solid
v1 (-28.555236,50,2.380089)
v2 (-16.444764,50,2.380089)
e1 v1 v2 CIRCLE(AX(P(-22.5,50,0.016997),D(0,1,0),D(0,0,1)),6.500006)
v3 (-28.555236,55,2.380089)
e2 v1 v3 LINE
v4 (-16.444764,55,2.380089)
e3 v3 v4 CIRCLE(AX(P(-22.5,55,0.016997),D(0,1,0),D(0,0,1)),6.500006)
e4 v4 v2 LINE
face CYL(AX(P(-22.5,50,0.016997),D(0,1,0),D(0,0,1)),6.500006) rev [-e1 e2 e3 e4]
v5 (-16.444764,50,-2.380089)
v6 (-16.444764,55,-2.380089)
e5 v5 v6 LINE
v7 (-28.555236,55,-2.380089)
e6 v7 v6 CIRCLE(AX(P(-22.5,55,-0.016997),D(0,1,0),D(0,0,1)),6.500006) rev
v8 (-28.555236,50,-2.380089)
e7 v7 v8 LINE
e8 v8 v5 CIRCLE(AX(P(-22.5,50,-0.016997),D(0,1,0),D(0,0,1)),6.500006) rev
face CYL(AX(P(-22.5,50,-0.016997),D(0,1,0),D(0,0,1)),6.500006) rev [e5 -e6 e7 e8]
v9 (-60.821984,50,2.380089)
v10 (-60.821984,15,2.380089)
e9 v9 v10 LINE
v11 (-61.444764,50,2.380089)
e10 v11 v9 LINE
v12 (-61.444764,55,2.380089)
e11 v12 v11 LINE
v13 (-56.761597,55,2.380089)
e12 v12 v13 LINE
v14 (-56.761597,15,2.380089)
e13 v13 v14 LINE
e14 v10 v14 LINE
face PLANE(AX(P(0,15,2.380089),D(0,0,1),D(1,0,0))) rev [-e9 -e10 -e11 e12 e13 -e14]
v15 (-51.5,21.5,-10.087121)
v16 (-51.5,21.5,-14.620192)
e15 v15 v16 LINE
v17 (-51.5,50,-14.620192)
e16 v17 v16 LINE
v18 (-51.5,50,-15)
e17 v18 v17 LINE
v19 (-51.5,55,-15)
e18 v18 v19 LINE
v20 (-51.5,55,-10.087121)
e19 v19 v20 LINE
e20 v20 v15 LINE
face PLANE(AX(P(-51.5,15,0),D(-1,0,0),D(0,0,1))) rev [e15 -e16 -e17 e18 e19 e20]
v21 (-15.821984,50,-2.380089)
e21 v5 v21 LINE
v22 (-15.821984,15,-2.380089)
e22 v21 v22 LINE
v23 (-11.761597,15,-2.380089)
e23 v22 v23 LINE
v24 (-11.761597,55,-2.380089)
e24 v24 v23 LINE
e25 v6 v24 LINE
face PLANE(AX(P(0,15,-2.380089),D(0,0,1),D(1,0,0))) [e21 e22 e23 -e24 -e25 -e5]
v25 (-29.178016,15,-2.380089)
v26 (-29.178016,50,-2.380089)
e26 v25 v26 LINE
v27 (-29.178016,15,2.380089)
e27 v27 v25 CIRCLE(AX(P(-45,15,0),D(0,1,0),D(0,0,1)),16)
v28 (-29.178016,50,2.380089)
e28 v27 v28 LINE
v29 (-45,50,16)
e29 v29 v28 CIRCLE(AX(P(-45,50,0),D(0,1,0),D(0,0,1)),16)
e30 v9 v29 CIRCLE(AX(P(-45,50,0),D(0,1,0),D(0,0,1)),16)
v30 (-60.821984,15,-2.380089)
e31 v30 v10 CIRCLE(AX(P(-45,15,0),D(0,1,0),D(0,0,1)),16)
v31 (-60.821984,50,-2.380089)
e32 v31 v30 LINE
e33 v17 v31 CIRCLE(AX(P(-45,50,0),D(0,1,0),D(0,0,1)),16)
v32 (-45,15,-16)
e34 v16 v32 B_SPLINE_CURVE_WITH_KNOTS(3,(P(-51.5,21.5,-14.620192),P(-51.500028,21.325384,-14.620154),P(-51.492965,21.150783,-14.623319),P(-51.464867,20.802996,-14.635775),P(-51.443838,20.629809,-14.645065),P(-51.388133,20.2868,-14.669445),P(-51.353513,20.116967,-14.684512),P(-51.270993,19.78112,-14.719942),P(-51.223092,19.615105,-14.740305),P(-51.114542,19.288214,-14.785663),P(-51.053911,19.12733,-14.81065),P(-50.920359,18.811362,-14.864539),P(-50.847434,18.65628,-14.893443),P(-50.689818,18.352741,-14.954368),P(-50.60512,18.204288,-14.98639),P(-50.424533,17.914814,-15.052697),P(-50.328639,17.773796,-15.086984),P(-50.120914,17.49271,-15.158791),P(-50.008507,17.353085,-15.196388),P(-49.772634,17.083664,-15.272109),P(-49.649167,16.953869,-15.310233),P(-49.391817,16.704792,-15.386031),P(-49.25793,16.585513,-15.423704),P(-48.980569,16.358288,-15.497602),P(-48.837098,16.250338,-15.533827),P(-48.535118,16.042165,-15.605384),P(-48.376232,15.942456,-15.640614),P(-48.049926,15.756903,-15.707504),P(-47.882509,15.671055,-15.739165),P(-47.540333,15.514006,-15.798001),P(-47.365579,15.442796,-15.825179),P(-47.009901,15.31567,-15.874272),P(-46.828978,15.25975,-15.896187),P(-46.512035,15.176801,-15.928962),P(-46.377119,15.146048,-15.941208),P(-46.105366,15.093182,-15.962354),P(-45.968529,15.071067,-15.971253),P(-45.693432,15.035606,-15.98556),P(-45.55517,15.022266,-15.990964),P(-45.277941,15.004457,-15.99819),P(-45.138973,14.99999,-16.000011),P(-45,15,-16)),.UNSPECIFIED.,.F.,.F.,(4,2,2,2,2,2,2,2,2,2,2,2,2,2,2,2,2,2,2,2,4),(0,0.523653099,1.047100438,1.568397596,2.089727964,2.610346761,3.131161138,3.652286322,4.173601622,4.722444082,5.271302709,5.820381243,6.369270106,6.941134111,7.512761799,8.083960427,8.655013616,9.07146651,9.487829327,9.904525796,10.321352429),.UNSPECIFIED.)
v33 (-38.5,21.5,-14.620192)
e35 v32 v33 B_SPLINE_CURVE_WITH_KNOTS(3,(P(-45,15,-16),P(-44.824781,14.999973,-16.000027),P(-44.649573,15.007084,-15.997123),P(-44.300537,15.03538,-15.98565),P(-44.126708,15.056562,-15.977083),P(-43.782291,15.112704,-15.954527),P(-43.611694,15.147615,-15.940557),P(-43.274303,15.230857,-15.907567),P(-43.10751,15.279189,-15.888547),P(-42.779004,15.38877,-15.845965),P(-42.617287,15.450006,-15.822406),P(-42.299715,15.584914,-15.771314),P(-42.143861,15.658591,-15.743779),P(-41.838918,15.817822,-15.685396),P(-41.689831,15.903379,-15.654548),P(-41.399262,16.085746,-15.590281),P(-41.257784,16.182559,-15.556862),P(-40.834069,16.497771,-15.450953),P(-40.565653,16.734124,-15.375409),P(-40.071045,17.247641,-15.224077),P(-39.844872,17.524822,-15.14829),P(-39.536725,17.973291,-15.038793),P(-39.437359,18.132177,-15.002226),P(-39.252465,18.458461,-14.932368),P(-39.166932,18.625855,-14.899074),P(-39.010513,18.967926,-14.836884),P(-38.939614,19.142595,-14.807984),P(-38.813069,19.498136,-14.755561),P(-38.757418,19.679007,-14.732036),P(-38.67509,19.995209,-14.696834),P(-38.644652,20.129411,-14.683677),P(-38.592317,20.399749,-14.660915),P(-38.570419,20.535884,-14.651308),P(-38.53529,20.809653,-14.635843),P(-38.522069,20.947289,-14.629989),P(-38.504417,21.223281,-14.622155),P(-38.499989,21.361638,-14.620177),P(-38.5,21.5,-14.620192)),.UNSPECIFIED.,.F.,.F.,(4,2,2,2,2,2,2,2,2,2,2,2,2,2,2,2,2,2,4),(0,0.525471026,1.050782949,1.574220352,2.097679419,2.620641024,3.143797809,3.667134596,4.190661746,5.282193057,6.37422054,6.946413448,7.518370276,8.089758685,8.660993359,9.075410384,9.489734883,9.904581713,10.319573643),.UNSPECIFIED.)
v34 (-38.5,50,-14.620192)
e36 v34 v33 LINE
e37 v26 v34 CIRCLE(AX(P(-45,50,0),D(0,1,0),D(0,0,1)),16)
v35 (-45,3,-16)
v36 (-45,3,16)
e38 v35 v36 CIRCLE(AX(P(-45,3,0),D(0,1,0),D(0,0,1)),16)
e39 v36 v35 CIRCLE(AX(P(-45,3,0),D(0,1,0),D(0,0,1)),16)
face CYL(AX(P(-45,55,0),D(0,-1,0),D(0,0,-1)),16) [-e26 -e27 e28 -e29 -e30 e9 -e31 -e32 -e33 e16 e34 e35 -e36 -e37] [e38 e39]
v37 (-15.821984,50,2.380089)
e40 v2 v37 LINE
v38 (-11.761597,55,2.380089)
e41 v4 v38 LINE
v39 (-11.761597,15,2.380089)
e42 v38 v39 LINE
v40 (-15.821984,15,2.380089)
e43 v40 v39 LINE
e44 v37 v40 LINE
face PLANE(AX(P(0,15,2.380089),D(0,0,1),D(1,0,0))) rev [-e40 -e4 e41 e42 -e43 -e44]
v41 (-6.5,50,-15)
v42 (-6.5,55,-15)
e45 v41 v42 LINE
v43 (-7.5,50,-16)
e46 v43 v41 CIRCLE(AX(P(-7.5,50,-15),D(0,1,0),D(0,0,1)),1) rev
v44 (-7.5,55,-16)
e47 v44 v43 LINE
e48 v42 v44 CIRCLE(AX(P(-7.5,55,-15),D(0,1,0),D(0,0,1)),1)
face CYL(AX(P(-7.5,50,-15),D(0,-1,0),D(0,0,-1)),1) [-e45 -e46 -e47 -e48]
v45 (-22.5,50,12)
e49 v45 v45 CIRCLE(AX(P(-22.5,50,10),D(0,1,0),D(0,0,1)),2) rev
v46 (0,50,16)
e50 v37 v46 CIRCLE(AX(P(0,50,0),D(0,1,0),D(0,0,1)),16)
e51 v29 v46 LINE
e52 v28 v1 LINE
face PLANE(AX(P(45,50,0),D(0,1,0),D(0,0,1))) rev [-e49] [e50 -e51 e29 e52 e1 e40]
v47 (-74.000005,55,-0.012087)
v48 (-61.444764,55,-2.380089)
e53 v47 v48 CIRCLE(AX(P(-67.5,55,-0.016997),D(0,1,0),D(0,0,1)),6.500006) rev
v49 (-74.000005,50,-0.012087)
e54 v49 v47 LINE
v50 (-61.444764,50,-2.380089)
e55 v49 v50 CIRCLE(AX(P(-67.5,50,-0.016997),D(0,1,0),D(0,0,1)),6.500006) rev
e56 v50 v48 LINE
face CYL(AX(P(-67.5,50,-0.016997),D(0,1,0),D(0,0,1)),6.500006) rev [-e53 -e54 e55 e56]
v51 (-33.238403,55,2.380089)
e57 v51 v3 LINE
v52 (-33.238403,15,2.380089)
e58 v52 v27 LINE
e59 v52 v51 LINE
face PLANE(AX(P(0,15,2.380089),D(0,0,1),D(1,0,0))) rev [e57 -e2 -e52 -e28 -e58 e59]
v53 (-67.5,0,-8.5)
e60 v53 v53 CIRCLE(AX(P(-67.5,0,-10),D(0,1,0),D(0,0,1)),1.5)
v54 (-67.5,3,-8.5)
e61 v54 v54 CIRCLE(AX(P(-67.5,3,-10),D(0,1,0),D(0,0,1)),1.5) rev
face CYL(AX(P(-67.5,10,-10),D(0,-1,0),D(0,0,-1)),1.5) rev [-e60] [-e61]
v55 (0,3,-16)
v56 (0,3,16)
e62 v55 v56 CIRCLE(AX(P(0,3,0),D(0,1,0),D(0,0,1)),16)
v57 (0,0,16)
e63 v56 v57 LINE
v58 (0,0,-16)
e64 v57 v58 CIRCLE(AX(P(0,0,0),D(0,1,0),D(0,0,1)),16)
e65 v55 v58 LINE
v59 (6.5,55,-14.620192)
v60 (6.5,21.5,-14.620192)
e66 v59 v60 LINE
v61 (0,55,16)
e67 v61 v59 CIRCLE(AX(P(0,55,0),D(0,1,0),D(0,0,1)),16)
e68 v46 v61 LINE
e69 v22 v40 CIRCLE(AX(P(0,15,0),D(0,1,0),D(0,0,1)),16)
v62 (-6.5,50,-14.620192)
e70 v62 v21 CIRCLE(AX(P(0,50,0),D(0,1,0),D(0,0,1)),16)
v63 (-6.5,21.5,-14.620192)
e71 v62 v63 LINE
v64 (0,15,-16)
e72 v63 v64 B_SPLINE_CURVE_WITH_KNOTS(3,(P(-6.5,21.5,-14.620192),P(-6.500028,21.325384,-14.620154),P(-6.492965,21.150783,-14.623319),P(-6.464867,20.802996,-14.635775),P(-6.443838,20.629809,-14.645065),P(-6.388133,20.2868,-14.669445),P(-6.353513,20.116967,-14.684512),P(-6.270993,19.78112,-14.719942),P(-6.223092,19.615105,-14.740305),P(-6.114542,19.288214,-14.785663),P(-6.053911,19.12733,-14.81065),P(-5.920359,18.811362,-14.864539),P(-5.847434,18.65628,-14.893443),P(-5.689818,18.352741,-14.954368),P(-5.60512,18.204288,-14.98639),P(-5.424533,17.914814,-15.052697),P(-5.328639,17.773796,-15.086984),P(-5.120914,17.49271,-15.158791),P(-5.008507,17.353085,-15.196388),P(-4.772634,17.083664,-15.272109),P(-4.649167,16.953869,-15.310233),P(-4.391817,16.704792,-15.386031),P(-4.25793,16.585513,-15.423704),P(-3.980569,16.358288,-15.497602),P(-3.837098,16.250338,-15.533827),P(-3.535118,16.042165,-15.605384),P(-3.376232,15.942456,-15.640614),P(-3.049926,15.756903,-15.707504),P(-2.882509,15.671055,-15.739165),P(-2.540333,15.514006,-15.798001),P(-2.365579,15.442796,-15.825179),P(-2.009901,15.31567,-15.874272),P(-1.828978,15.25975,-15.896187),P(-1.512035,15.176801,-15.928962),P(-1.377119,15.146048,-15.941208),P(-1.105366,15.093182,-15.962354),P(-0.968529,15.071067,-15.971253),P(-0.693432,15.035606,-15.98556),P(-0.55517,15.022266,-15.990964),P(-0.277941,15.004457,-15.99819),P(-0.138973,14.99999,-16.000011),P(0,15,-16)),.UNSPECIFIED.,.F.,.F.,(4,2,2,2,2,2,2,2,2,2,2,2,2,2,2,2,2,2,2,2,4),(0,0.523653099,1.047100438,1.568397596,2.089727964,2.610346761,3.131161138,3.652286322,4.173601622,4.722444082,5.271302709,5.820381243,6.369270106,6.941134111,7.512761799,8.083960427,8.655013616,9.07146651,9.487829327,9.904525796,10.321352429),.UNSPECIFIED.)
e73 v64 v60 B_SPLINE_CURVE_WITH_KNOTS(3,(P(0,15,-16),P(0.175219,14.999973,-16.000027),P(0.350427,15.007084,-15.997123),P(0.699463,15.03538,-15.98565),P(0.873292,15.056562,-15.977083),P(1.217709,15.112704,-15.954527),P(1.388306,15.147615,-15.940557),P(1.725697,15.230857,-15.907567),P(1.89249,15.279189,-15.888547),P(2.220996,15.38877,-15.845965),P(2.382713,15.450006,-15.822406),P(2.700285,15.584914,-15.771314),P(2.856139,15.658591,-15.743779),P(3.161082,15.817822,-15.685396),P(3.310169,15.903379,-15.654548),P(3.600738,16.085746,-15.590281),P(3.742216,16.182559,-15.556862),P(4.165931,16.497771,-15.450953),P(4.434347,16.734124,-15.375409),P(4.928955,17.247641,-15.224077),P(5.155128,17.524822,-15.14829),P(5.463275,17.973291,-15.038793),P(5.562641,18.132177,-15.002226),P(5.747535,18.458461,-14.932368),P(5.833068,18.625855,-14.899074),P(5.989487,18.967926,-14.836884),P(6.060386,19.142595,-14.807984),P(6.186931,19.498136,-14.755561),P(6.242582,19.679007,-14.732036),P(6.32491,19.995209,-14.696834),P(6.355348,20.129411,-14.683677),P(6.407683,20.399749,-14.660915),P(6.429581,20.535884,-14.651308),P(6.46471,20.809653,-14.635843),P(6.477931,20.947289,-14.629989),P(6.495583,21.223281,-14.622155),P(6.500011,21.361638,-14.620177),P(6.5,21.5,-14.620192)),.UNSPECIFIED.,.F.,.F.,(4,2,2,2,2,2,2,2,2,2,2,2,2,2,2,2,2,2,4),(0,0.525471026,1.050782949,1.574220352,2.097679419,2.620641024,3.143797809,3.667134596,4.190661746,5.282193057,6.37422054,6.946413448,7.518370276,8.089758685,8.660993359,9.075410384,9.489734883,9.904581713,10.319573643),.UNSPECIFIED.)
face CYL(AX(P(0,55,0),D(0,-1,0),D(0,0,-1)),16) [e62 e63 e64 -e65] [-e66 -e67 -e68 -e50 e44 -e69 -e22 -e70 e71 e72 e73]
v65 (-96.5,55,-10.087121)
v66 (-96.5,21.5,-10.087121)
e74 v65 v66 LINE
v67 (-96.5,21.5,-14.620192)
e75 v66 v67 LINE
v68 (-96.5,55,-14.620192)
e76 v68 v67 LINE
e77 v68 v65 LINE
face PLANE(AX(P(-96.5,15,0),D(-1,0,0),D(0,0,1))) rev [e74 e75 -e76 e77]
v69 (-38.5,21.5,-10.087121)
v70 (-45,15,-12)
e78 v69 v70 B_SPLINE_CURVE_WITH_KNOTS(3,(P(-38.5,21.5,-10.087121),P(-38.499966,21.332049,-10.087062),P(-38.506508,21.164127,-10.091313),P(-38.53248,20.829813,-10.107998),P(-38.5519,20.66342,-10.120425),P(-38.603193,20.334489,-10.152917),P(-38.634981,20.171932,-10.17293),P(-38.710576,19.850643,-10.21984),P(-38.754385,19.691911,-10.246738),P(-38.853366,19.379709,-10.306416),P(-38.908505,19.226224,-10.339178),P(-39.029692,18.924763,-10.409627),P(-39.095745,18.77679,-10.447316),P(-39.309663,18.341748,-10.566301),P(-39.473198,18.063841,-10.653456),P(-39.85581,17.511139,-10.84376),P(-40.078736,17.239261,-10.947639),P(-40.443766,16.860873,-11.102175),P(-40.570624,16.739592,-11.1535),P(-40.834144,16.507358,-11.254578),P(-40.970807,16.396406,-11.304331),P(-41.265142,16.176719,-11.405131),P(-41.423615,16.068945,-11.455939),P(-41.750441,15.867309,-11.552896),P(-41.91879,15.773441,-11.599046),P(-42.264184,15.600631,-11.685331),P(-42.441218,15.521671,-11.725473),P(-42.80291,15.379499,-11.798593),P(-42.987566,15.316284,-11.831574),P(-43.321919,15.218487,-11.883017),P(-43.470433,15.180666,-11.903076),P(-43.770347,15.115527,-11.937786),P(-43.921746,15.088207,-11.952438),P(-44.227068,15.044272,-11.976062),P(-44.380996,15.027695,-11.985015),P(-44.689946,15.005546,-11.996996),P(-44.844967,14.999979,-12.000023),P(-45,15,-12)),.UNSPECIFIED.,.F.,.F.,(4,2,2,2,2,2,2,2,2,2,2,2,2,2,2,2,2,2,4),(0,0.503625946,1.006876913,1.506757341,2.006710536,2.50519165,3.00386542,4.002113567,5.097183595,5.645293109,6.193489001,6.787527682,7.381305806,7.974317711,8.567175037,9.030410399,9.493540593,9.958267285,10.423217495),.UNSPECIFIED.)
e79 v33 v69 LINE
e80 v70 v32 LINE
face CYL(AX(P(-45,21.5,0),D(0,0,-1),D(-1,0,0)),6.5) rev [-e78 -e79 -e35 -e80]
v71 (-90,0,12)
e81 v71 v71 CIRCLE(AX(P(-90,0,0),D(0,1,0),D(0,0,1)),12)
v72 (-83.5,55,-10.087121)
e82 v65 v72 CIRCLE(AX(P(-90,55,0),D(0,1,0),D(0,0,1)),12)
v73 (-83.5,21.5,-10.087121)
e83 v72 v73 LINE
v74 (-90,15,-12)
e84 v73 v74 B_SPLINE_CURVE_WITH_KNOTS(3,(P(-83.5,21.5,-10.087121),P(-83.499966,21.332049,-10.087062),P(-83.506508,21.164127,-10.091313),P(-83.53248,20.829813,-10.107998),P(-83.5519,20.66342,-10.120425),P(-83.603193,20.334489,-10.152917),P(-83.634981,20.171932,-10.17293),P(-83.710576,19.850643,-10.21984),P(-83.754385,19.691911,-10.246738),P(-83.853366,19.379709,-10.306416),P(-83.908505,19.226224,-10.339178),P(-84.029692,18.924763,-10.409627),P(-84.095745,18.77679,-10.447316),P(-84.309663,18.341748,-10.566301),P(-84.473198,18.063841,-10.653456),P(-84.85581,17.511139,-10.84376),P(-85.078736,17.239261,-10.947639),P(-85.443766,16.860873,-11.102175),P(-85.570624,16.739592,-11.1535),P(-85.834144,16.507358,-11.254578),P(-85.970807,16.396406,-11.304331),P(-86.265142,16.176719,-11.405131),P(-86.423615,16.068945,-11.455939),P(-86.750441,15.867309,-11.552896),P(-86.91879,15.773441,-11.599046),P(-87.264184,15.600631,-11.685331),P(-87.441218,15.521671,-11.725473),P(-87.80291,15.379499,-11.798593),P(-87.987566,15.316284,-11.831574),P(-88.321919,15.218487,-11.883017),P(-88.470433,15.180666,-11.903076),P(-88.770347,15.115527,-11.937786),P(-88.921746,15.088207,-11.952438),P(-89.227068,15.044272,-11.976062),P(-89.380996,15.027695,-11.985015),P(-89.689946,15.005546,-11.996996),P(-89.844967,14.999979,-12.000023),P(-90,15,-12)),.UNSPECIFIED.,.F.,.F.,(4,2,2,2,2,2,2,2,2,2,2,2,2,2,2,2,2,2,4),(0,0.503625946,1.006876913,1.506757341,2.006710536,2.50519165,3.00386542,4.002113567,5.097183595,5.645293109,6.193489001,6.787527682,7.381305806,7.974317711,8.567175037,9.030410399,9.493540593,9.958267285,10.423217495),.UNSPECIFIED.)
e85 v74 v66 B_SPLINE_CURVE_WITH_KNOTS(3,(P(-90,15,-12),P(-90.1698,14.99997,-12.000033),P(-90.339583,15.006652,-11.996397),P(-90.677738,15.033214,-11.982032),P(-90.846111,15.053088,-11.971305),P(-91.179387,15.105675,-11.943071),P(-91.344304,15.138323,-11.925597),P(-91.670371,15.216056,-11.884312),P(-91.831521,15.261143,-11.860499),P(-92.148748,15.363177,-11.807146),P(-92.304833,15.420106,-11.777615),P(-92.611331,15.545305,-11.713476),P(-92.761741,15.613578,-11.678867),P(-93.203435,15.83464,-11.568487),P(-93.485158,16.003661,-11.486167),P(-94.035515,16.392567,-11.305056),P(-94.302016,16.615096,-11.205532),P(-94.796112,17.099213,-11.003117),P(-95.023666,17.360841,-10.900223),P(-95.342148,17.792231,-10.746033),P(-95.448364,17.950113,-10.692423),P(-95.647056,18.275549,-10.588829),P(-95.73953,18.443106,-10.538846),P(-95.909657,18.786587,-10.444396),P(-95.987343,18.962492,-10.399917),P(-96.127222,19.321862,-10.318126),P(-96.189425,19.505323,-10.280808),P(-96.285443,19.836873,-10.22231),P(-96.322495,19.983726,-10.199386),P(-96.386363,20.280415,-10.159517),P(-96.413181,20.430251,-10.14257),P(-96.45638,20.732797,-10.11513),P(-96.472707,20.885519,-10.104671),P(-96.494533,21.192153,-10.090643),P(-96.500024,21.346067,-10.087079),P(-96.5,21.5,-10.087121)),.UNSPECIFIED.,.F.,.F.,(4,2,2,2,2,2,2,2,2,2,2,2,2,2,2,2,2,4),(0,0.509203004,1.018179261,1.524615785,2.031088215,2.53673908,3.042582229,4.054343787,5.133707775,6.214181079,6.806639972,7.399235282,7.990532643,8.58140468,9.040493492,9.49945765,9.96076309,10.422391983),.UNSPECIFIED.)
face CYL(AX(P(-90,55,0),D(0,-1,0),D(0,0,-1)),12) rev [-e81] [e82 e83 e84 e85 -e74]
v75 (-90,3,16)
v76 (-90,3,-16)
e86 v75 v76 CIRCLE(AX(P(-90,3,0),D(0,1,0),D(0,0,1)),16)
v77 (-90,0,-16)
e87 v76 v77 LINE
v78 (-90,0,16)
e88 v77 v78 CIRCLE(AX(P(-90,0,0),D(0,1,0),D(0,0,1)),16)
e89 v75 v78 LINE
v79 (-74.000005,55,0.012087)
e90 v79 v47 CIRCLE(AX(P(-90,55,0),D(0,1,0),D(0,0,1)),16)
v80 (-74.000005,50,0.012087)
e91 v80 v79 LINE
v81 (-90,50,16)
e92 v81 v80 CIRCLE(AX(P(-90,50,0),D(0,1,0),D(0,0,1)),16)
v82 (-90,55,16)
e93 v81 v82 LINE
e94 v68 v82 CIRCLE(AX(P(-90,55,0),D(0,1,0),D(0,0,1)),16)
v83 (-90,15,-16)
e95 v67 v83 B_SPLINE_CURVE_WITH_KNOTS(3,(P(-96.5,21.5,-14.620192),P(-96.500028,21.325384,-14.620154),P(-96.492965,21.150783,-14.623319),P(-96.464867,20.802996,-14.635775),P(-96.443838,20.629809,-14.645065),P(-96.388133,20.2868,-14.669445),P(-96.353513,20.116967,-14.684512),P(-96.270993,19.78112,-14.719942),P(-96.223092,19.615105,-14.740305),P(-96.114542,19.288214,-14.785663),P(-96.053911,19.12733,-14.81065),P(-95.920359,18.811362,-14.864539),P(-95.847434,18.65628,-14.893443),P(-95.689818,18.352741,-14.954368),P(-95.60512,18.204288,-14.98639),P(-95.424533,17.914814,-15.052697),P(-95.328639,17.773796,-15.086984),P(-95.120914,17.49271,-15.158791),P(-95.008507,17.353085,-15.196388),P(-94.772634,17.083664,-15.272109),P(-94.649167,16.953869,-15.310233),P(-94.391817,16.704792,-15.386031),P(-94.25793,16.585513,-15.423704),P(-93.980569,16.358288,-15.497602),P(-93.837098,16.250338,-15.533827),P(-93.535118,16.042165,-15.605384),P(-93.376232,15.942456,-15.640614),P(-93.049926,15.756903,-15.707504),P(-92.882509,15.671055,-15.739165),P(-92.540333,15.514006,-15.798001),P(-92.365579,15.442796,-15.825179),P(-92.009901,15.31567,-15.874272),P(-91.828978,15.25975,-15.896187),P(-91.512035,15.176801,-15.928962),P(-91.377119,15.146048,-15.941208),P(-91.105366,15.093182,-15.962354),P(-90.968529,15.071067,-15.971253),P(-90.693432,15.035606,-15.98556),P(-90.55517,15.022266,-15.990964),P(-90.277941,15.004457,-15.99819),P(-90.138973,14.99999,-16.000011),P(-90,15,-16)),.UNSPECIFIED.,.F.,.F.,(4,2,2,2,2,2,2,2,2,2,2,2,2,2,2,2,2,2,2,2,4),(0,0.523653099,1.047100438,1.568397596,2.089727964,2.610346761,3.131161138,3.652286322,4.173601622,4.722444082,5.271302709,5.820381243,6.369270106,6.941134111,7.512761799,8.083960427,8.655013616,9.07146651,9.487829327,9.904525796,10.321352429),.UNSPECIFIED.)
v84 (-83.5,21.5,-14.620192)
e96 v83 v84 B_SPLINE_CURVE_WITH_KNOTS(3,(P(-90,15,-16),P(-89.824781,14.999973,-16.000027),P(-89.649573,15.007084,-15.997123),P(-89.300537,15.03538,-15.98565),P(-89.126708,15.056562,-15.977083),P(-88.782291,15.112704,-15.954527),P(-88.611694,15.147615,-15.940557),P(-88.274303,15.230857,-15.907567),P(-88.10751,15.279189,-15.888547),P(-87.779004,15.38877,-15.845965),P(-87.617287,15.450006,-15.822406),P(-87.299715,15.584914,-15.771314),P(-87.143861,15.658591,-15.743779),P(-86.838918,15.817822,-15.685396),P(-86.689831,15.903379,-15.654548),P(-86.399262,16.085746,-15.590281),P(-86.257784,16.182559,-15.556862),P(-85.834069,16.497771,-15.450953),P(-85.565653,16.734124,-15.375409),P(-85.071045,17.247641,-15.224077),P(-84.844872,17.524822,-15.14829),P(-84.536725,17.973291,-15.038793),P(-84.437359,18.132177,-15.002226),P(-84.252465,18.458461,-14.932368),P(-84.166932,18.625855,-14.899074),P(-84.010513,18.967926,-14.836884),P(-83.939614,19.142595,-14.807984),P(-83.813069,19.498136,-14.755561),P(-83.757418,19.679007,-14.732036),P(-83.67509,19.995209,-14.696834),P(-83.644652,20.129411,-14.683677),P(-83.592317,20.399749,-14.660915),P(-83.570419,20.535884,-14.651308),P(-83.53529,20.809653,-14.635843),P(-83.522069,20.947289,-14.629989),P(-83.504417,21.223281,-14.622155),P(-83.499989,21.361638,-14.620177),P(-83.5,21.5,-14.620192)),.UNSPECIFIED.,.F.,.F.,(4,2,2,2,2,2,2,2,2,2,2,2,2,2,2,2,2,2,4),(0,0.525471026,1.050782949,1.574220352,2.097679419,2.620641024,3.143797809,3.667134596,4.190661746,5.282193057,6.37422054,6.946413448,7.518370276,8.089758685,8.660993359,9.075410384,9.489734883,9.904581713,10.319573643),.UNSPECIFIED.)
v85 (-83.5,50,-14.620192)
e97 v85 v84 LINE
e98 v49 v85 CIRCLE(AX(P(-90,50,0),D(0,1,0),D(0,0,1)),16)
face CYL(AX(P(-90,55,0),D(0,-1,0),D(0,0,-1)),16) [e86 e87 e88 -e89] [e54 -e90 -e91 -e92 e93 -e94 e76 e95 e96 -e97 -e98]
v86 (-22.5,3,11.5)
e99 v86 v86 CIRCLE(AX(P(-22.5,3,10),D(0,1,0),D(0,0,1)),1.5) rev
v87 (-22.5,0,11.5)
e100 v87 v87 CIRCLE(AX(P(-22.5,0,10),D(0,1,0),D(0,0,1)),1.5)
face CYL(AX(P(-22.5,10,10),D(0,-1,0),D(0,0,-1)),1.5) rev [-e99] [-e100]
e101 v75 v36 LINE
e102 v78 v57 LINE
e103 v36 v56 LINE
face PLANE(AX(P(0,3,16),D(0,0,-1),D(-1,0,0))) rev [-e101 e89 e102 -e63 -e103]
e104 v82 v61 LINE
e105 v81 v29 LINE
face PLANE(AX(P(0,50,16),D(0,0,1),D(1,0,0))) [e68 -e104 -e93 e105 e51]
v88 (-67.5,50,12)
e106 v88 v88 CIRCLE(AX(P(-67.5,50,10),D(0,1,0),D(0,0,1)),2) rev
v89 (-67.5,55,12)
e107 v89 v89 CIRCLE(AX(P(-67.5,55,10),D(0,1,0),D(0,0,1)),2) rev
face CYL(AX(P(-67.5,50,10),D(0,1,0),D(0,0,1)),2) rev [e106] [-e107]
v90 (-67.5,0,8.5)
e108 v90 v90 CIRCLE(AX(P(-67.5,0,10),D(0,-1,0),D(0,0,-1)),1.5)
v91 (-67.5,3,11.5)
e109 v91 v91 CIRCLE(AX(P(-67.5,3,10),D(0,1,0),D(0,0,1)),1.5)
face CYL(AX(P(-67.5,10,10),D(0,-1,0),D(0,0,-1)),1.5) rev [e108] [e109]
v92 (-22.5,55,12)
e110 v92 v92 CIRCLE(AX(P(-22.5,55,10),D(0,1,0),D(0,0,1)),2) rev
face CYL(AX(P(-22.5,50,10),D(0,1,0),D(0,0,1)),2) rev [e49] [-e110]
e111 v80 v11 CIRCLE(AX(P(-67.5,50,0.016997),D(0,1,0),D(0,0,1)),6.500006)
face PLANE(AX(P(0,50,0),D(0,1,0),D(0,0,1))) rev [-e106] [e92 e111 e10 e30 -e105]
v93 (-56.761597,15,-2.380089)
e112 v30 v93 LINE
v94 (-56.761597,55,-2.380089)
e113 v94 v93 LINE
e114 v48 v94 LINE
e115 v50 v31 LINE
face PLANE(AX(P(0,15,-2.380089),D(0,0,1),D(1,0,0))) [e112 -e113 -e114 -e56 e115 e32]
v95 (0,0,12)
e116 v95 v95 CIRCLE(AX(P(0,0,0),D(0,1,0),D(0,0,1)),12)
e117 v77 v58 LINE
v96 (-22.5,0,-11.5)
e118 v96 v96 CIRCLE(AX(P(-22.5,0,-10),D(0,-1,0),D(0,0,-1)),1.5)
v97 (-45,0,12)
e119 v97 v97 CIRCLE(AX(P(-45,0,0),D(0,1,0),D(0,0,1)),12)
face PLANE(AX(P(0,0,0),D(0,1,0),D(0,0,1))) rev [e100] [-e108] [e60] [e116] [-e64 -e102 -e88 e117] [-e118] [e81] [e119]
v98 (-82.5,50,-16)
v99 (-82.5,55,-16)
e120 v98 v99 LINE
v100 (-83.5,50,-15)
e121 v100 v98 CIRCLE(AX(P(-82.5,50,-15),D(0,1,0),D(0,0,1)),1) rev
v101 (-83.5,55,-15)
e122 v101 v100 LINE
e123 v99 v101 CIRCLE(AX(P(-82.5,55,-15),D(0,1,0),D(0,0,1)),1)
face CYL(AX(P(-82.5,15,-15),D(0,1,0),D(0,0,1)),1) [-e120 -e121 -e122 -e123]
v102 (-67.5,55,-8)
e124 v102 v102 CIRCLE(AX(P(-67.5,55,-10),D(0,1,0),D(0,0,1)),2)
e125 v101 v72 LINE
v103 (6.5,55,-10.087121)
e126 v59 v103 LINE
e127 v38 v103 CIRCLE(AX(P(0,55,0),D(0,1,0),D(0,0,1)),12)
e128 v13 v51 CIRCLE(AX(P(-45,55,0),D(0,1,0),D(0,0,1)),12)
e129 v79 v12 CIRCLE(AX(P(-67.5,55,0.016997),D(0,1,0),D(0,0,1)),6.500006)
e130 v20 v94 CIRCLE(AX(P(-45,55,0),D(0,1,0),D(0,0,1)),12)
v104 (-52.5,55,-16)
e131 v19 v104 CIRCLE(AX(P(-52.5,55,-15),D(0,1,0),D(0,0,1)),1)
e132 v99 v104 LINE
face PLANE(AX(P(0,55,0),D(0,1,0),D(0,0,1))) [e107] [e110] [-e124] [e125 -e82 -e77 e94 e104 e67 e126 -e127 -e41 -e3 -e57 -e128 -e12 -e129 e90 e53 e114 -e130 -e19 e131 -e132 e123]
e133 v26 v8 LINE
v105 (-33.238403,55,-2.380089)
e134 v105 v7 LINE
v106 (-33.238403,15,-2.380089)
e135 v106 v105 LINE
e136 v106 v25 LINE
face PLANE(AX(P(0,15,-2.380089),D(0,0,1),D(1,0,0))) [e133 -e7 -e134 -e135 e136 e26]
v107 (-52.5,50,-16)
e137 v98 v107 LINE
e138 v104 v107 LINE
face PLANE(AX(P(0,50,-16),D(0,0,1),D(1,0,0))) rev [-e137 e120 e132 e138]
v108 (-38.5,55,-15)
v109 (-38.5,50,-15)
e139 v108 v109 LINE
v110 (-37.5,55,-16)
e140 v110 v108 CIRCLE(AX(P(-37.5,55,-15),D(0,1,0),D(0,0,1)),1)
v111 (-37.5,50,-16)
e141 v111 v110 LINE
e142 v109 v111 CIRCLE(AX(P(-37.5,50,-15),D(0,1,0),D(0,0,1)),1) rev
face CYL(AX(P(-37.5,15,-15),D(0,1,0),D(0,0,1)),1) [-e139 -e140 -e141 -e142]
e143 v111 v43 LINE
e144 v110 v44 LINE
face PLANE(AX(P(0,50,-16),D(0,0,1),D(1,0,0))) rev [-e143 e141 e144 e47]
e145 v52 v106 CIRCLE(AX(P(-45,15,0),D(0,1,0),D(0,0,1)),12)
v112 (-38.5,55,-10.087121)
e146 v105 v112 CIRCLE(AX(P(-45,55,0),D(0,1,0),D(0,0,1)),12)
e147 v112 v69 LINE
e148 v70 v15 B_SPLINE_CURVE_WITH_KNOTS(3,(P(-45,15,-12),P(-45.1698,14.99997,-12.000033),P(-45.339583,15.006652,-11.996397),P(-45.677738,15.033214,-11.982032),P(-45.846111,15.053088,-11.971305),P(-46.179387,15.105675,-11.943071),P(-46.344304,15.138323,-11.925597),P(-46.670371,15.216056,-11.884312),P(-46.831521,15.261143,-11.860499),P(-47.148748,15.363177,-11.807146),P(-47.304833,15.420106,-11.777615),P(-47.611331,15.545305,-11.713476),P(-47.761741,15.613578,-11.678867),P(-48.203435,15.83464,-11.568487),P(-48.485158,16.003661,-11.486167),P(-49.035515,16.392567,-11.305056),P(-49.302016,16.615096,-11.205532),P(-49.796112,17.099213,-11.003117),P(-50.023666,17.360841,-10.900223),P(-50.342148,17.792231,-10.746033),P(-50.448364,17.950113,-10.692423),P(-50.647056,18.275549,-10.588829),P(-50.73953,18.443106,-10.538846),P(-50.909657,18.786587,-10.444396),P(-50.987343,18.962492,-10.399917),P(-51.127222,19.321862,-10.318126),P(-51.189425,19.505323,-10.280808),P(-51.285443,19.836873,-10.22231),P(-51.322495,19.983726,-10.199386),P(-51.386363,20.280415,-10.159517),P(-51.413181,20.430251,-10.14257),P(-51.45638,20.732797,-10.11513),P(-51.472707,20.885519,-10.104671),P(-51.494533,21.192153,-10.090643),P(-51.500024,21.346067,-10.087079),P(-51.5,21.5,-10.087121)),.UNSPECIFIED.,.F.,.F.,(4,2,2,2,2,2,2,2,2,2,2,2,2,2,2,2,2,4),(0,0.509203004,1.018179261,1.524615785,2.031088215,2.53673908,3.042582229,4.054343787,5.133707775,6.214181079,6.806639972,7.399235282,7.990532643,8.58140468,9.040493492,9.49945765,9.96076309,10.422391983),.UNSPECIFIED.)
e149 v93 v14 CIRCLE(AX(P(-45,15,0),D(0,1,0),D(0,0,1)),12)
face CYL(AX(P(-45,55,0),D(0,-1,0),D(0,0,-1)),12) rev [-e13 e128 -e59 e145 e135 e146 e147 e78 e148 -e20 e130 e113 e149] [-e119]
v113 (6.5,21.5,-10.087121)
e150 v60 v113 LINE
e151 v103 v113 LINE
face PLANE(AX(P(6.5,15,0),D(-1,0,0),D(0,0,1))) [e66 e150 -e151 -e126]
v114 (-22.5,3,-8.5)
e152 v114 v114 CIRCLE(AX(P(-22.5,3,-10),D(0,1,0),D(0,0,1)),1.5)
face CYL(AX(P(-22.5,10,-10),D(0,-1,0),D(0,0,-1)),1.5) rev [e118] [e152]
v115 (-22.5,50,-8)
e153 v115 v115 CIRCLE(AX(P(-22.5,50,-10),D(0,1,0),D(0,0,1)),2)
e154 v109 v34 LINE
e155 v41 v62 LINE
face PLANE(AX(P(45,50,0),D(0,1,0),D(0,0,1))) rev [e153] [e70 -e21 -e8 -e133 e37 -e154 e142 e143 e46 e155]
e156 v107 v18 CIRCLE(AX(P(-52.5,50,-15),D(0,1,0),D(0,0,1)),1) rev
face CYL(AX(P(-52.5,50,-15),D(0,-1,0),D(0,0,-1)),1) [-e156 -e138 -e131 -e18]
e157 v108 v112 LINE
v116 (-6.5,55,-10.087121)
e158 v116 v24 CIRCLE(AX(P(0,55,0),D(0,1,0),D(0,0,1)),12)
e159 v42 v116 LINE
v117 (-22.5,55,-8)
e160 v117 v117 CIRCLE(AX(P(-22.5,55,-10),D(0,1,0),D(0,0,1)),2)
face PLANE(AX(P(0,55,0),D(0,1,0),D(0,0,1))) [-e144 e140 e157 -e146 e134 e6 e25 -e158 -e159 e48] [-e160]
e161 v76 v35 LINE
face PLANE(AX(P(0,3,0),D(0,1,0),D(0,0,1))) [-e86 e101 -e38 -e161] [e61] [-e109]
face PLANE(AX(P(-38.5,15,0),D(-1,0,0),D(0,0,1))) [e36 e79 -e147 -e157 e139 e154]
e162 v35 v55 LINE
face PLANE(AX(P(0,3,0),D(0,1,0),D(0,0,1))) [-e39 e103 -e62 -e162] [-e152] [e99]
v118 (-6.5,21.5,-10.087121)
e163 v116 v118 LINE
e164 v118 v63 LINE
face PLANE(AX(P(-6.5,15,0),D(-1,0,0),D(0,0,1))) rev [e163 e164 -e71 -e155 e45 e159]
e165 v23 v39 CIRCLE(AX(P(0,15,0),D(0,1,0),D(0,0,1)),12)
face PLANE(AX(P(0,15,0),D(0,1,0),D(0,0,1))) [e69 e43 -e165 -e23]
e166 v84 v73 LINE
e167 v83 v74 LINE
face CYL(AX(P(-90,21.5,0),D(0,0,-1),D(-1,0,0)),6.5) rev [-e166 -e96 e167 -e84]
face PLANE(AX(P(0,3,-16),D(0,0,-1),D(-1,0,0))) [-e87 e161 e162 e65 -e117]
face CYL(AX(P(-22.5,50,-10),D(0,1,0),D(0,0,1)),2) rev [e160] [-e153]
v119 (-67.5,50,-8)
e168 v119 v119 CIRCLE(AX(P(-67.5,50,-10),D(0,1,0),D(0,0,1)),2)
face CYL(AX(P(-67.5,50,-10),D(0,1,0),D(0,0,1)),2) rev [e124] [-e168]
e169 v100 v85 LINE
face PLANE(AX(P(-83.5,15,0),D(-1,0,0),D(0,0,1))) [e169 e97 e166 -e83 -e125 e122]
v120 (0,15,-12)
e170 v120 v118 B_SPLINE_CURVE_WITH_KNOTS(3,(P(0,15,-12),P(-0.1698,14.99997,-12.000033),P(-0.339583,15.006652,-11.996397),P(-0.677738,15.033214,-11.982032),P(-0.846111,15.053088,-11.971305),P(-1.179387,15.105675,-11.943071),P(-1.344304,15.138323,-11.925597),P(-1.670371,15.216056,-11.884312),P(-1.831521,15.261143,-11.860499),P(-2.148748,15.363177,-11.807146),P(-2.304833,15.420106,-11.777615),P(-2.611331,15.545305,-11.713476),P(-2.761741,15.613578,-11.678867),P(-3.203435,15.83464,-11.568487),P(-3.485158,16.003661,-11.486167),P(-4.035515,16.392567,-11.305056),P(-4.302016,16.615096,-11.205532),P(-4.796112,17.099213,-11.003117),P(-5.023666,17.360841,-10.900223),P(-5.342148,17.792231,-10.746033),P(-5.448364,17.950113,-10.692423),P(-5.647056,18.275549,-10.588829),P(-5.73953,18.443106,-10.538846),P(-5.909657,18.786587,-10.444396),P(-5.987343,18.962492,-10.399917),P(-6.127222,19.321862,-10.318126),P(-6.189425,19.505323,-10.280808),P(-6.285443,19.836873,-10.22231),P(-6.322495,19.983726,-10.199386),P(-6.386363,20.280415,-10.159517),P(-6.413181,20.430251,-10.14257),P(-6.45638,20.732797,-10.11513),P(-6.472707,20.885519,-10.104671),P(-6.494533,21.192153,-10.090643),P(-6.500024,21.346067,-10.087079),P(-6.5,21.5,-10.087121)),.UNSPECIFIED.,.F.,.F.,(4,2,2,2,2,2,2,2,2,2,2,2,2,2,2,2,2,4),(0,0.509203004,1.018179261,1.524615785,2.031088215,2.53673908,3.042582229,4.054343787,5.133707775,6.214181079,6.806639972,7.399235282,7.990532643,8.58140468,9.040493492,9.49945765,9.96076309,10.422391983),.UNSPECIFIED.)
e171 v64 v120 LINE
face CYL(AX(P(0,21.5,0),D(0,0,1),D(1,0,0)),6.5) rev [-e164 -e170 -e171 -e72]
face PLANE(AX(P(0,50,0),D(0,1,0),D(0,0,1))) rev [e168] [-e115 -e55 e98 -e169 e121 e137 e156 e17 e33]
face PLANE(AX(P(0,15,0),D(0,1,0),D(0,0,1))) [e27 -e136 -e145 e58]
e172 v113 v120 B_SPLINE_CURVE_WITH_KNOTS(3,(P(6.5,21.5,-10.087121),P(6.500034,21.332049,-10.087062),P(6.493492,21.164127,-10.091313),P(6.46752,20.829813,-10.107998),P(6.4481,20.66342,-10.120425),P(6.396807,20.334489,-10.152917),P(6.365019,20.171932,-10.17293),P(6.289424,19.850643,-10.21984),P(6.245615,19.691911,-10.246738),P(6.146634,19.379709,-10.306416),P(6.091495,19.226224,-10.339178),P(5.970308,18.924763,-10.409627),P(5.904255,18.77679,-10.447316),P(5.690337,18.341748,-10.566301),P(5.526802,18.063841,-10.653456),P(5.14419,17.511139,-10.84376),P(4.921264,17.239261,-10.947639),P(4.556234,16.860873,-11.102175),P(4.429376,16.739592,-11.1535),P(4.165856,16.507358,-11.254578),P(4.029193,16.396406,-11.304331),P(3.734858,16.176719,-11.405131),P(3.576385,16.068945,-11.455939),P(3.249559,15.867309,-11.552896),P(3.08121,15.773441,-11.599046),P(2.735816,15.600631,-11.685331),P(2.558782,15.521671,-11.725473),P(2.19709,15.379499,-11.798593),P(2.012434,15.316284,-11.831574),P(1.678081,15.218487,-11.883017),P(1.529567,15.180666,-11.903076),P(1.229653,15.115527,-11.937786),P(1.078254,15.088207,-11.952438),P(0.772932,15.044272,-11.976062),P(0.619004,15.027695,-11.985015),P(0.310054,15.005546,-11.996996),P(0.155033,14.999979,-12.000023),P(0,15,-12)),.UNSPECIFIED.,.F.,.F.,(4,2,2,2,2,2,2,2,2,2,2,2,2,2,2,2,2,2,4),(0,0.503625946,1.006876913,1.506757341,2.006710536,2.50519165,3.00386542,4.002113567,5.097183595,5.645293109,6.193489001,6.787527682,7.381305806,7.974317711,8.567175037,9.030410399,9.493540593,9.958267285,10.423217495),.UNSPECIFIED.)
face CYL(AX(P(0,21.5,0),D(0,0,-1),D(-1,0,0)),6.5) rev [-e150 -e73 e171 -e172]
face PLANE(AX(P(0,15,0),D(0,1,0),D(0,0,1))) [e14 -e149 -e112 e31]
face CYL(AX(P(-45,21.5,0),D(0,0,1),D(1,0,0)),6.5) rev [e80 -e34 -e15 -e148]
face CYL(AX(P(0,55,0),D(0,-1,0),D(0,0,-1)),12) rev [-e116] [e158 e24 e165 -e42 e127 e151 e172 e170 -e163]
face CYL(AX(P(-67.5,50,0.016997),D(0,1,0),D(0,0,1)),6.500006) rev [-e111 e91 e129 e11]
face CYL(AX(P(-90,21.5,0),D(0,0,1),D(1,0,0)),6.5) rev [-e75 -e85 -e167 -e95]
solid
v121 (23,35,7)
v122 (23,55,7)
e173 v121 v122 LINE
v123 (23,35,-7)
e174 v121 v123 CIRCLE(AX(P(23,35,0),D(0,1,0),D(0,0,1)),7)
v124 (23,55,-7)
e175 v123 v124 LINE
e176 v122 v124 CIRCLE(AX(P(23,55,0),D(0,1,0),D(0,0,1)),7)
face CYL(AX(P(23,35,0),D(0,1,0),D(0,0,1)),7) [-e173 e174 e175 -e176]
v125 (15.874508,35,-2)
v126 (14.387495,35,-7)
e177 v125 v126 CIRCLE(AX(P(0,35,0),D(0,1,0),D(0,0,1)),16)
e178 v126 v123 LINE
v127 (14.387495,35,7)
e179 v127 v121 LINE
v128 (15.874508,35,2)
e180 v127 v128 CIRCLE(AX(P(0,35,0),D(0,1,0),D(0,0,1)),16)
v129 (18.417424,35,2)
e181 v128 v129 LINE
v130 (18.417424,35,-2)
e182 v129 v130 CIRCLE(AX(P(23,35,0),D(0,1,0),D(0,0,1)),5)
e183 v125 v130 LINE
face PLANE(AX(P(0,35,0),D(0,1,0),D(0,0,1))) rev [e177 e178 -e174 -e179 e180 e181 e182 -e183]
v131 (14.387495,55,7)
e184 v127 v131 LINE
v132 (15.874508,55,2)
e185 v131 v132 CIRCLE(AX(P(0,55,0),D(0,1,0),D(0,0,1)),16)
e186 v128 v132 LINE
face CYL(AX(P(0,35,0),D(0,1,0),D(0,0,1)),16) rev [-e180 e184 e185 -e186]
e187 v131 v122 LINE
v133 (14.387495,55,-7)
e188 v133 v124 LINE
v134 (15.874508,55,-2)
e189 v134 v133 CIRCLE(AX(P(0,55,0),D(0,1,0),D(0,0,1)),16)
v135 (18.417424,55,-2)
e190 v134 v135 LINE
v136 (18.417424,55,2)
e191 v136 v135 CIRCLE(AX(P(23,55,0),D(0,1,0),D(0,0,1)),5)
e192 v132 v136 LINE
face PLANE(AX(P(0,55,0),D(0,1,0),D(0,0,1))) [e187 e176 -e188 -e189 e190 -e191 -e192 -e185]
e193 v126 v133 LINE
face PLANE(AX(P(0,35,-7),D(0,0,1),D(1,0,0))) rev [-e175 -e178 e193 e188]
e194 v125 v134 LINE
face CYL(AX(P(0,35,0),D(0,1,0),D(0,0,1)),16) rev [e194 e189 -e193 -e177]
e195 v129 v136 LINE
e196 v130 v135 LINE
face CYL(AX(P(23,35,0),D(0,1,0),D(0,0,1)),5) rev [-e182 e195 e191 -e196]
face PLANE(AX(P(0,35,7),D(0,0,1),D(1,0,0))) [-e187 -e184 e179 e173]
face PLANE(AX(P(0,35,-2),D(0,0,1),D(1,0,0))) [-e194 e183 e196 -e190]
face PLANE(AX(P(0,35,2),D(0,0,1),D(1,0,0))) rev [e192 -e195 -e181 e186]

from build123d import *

# Parameters (mm, degrees)
SKETCH1_R               = 16
SKETCH1_R_2             = 12
BOSS_EXTRUDE1_DEPTH     = 55
BOSS_EXTRUDE1_2_DEPTH   = 55
BOSS_EXTRUDE1_3_DEPTH   = 55
BOSS_EXTRUDE2_DEPTH     = 3
BOSS_EXTRUDE3_DEPTH     = 20
SKETCH5_R               = 1.5
CUT_EXTRUDE4_DEPTH      = 10
BOSS_EXTRUDE4_START     = -5
BOSS_EXTRUDE4_OUTLINE_R = 2
BOSS_EXTRUDE4_DEPTH     = 5
LPATTERN6_COUNT         = 2
LPATTERN6_PITCH         = 45
CUT_EXTRUDE6_START      = -40
SKETCH6_W               = 13
SKETCH6_H               = 20
SKETCH6_H_2             = 2.380089233
CUT_EXTRUDE6_DEPTH      = 40
FILLET19_R              = 6.5
FILLET20_R              = 1


# Read off the part's stored shape, not the designer's step: Boss-Extrude4
with BuildPart() as part:
    # Sketch1 → Boss-Extrude1 (new body)
    with BuildSketch(Plane(origin=(0, 0, 0), x_dir=(1, 0, 0), z_dir=(0, 1, 0))):
        with Locations(Location((0, 0, 0), (0, 0, 270))):
            Circle(SKETCH1_R)
        with Locations(Location((0, 0, 0), (0, 0, 270))):
            Circle(SKETCH1_R_2, mode=Mode.SUBTRACT)
    extrude(amount=BOSS_EXTRUDE1_DEPTH)



with BuildPart() as body_2:
    # Sketch1 → Boss-Extrude1 2 (new body)
    with BuildSketch(Plane(origin=(0, 0, 0), x_dir=(1, 0, 0), z_dir=(0, 1, 0))):
        with Locations(Location((-45, 0, 0), (0, 0, 270))):
            Circle(SKETCH1_R)
        with Locations(Location((-45, 0, 0), (0, 0, 270))):
            Circle(SKETCH1_R_2, mode=Mode.SUBTRACT)
    extrude(amount=BOSS_EXTRUDE1_2_DEPTH)


with BuildPart() as body_3:
    # Sketch1 → Boss-Extrude1 3 (new body)
    with BuildSketch(Plane(origin=(0, 0, 0), x_dir=(1, 0, 0), z_dir=(0, 1, 0))):
        with Locations(Location((-90, 0, 0), (0, 0, 270))):
            Circle(SKETCH1_R)
        with Locations(Location((-90, 0, 0), (0, 0, 270))):
            Circle(SKETCH1_R_2, mode=Mode.SUBTRACT)
    extrude(amount=BOSS_EXTRUDE1_3_DEPTH)


with BuildPart() as part_1:
    add(part.part)

    add(body_2.part)  # Boss-Extrude2 merges body 2

    add(body_3.part)  # Boss-Extrude2 merges body 3
    # Sketch2 → Boss-Extrude2 (add)
    with BuildSketch(Plane(origin=(0, 0, 0), x_dir=(1, 0, 0), z_dir=(0, 1, 0))):
        with BuildLine():
            Line((-61, 0), (-74, 0))
            ThreePointArc((-74, 0), (-78.686291501, -11.313708499), (-90, -16))
            Line((-90, -16), (-45, -16))
            ThreePointArc((-45, -16), (-56.313708499, -11.313708499), (-61, 0))
        make_face()
        with BuildLine():
            Line((0, 16), (-45, 16))
            ThreePointArc((-45, 16), (-33.686291501, 11.313708499), (-29, 0))
            Line((-29, 0), (-16, 0))
            ThreePointArc((-16, 0), (-11.313708499, 11.313708499), (0, 16))
        make_face()
        with BuildLine():
            ThreePointArc((-29, 0), (-33.686291501, -11.313708499), (-45, -16))
            Line((-45, -16), (0, -16))
            ThreePointArc((0, -16), (-11.313708499, -11.313708499), (-16, 0))
            Line((-16, 0), (-29, 0))
        make_face()
        with BuildLine():
            ThreePointArc((-90, 16), (-78.686291501, 11.313708499), (-74, 0))
            Line((-74, 0), (-61, 0))
            ThreePointArc((-61, 0), (-56.313708499, 11.313708499), (-45, 16))
            Line((-45, 16), (-90, 16))
        make_face()
    extrude(amount=BOSS_EXTRUDE2_DEPTH)

    # Sketch5 → Cut-Extrude4 (cut)
    with BuildSketch(Plane.XZ):
        with Locations(Location((-67.5, 10, 0), (0, 0, 270))):
            Circle(SKETCH5_R)
        with Locations(Location((-67.5, -10, 0), (0, 0, 90))):
            Circle(SKETCH5_R)
        with Locations(Location((-22.5, -10, 0), (0, 0, 270))):
            Circle(SKETCH5_R)
        with Locations(Location((-22.5, 10, 0), (0, 0, 90))):
            Circle(SKETCH5_R)
    extrude(amount=-CUT_EXTRUDE4_DEPTH, mode=Mode.SUBTRACT)

    # Boss-Extrude4 outline → Boss-Extrude4 (add)
    # profile 1 of 2: a face of its own
    with BuildSketch(Plane(origin=(0, 55, 0), x_dir=(1, 0, 0), z_dir=(0, 1, 0)).offset(BOSS_EXTRUDE4_START)):
        with BuildLine():
            ThreePointArc((-74.000004565, -0.012086763), (-78.690565624, -11.317981008), (-90, -16))
            Line((-90, -16), (-45, -16))
            ThreePointArc((-45, -16), (-56.309434376, -11.317981008), (-60.999995435, -0.012086763))
            ThreePointArc((-60.999995435, -0.012086763), (-67.5, -6.517003435), (-74.000004565, -0.012086763))
        make_face()
        with Locations((-67.5, -10)):
            Circle(BOSS_EXTRUDE4_OUTLINE_R, mode=Mode.SUBTRACT)
    # profile 2 of 2: a face of its own
    with BuildSketch(Plane(origin=(0, 55, 0), x_dir=(1, 0, 0), z_dir=(0, 1, 0)).offset(BOSS_EXTRUDE4_START)):
        with BuildLine():
            Line((-45, 16), (-90, 16))
            ThreePointArc((-90, 16), (-78.690565624, 11.317981008), (-74.000004565, 0.012086763))
            ThreePointArc((-74.000004565, 0.012086763), (-67.5, 6.517003435), (-60.999995435, 0.012086763))
            ThreePointArc((-60.999995435, 0.012086763), (-56.309434376, 11.317981008), (-45, 16))
        make_face()
        with Locations((-67.5, 10)):
            Circle(BOSS_EXTRUDE4_OUTLINE_R, mode=Mode.SUBTRACT)
    boss_extrude4 = extrude(amount=BOSS_EXTRUDE4_DEPTH)

    # LPattern6: Boss-Extrude4 ×2
    with Locations(*[(i * LPATTERN6_PITCH, 0, 0) for i in range(1, LPATTERN6_COUNT)]):
        add(boss_extrude4)

    # Sketch6 → Cut-Extrude6 (cut)
    with BuildSketch(Plane(origin=(0, 55, 0), x_dir=(1, 0, 0), z_dir=(0, 1, 0)).offset(CUT_EXTRUDE6_START)):
        with BuildLine():
            Line((-51.5, 20), (-51.5, 16))
            Line((-51.5, 16), (-45, 16))
            ThreePointArc((-45, 16), (-41.677581022, 15.651246983), (-38.5, 14.620191517))
            Line((-38.5, 14.620191517), (-38.5, 20))
            Line((-38.5, 20), (-51.5, 20))
        make_face()
        with BuildLine():
            Line((-45, 16), (-51.5, 16))
            Line((-51.5, 16), (-51.5, 10.087120501))
            ThreePointArc((-51.5, 10.087120501), (-45, 12), (-38.5, 10.087120501))
            Line((-38.5, 10.087120501), (-38.5, 14.620191517))
            ThreePointArc((-38.5, 14.620191517), (-41.677581022, 15.651246983), (-45, 16))
        make_face()
        with BuildLine():
            ThreePointArc((-38.5, 10.087120501), (-45, 12), (-51.5, 10.087120501))
            Line((-51.5, 10.087120501), (-51.5, 2.380089233))
            Line((-51.5, 2.380089233), (-38.5, 2.380089233))
            Line((-38.5, 2.380089233), (-38.5, 10.087120501))
        make_face()
        with BuildLine():
            Line((-96.5, 10.087120501), (-96.5, 0))
            Line((-96.5, 0), (-83.5, 0))
            Line((-83.5, 0), (-83.5, 2.380089233))
            Line((-83.5, 2.380089233), (-83.5, 10.087120501))
            ThreePointArc((-83.5, 10.087120501), (-90, 12), (-96.5, 10.087120501))
        make_face()
        with BuildLine():
            Line((-96.5, 14.620191517), (-96.5, 10.087120501))
            ThreePointArc((-96.5, 10.087120501), (-90, 12), (-83.5, 10.087120501))
            Line((-83.5, 10.087120501), (-83.5, 16))
            Line((-83.5, 16), (-90, 16))
            ThreePointArc((-90, 16), (-93.322418978, 15.651246983), (-96.5, 14.620191517))
        make_face()
        with BuildLine():
            Line((-96.5, 20), (-96.5, 14.620191517))
            ThreePointArc((-96.5, 14.620191517), (-93.322418978, 15.651246983), (-90, 16))
            Line((-90, 16), (-83.5, 16))
            Line((-83.5, 16), (-83.5, 20))
            Line((-83.5, 20), (-96.5, 20))
        make_face()
        with Locations((0, 10)):
            Rectangle(SKETCH6_W, SKETCH6_H)
        with BuildLine():
            Line((-6.5, 2.380089233), (-29.178016078, 2.380089233))
            ThreePointArc((-29.178016078, 2.380089233), (-29.044566086, 1.193368602), (-29, 0))
            Line((-29, 0), (-6.5, 0))
            Line((-6.5, 0), (-6.5, 2.380089233))
        make_face()
        with BuildLine():
            ThreePointArc((-29, 0), (-29.044566086, -1.193368602), (-29.178016078, -2.380089233))
            Line((-29.178016078, -2.380089233), (-6.5, -2.380089233))
            Line((-6.5, -2.380089233), (-6.5, 0))
            Line((-6.5, 0), (-29, 0))
        make_face()
        with BuildLine():
            ThreePointArc((-33, 0), (-33.05974938, -1.195999636), (-33.238402522, -2.380089233))
            Line((-33.238402522, -2.380089233), (-29.178016078, -2.380089233))
            ThreePointArc((-29.178016078, -2.380089233), (-29.044566086, -1.193368602), (-29, 0))
            Line((-29, 0), (-33, 0))
        make_face()
        with BuildLine():
            ThreePointArc((-33.238402522, 2.380089233), (-33.05974938, 1.195999636), (-33, 0))
            Line((-33, 0), (-29, 0))
            ThreePointArc((-29, 0), (-29.044566086, 1.193368602), (-29.178016078, 2.380089233))
            Line((-29.178016078, 2.380089233), (-33.238402522, 2.380089233))
        make_face()
        with BuildLine():
            Line((-38.5, 2.380089233), (-38.5, 0))
            Line((-38.5, 0), (-33, 0))
            ThreePointArc((-33, 0), (-33.05974938, 1.195999636), (-33.238402522, 2.380089233))
            Line((-33.238402522, 2.380089233), (-38.5, 2.380089233))
        make_face()
        with BuildLine():
            Line((-51.5, 0), (-57, 0))
            ThreePointArc((-57, 0), (-56.94025062, -1.195999636), (-56.761597478, -2.380089233))
            Line((-56.761597478, -2.380089233), (-33.238402522, -2.380089233))
            ThreePointArc((-33.238402522, -2.380089233), (-33.05974938, -1.195999636), (-33, 0))
            Line((-33, 0), (-38.5, 0))
            Line((-38.5, 0), (-51.5, 0))
        make_face()
        with Locations((-45, 1.190044617)):
            Rectangle(SKETCH6_W, SKETCH6_H_2)
        with BuildLine():
            ThreePointArc((-56.761597478, 2.380089233), (-56.94025062, 1.195999636), (-57, 0))
            Line((-57, 0), (-51.5, 0))
            Line((-51.5, 0), (-51.5, 2.380089233))
            Line((-51.5, 2.380089233), (-56.761597478, 2.380089233))
        make_face()
        with BuildLine():
            ThreePointArc((-60.999995435, 0.012086763), (-60.999998859, 0.006043382), (-61, 0))
            Line((-61, 0), (-57, 0))
            ThreePointArc((-57, 0), (-56.94025062, 1.195999636), (-56.761597478, 2.380089233))
            Line((-56.761597478, 2.380089233), (-61.444764362, 2.380089233))
            ThreePointArc((-61.444764362, 2.380089233), (-61.1117003, 1.216876341), (-60.999995435, 0.012086763))
        make_face()
        with BuildLine():
            Line((-61, 0), (-74, 0))
            ThreePointArc((-74, 0), (-74.000001141, -0.006043382), (-74.000004565, -0.012086763))
            ThreePointArc((-74.000004565, -0.012086763), (-73.8882997, -1.216876341), (-73.555235638, -2.380089233))
            Line((-73.555235638, -2.380089233), (-61.444764362, -2.380089233))
            ThreePointArc((-61.444764362, -2.380089233), (-61.1117003, -1.216876341), (-60.999995435, -0.012086763))
            ThreePointArc((-60.999995435, -0.012086763), (-60.999998859, -0.006043382), (-61, 0))
        make_face()
        with BuildLine():
            Line((-57, 0), (-61, 0))
            ThreePointArc((-61, 0), (-60.999998859, -0.006043382), (-60.999995435, -0.012086763))
            ThreePointArc((-60.999995435, -0.012086763), (-61.1117003, -1.216876341), (-61.444764362, -2.380089233))
            Line((-61.444764362, -2.380089233), (-56.761597478, -2.380089233))
            ThreePointArc((-56.761597478, -2.380089233), (-56.94025062, -1.195999636), (-57, 0))
        make_face()
        with BuildLine():
            ThreePointArc((-74.000004565, 0.012086763), (-74.000001141, 0.006043382), (-74, 0))
            Line((-74, 0), (-61, 0))
            ThreePointArc((-61, 0), (-60.999998859, 0.006043382), (-60.999995435, 0.012086763))
            ThreePointArc((-60.999995435, 0.012086763), (-61.1117003, 1.216876341), (-61.444764362, 2.380089233))
            Line((-61.444764362, 2.380089233), (-73.555235638, 2.380089233))
            ThreePointArc((-73.555235638, 2.380089233), (-73.8882997, 1.216876341), (-74.000004565, 0.012086763))
        make_face()
        with BuildLine():
            Line((-83.5, 0), (-96.5, 0))
            Line((-96.5, 0), (-102, 0))
            ThreePointArc((-102, 0), (-91.195999636, -11.94025062), (-78.238402522, -2.380089233))
            Line((-78.238402522, -2.380089233), (-83.5, -2.380089233))
            Line((-83.5, -2.380089233), (-83.5, 0))
        make_face()
        with BuildLine():
            Line((-78, 0), (-83.5, 0))
            Line((-83.5, 0), (-83.5, -2.380089233))
            Line((-83.5, -2.380089233), (-78.238402522, -2.380089233))
            ThreePointArc((-78.238402522, -2.380089233), (-78.05974938, -1.195999636), (-78, 0))
        make_face()
        with BuildLine():
            Line((-83.5, 2.380089233), (-83.5, 0))
            Line((-83.5, 0), (-78, 0))
            ThreePointArc((-78, 0), (-78.05974938, 1.195999636), (-78.238402522, 2.380089233))
            Line((-78.238402522, 2.380089233), (-83.5, 2.380089233))
        make_face()
    extrude(amount=CUT_EXTRUDE6_DEPTH, mode=Mode.SUBTRACT)

    # Fillet19
    fillet19_edges = [part_1.edges().sort_by_distance(p)[0] for p in [
        (-83.5, 15, -12.353656009),
        (-96.5, 15, -12.353656009),
        (-51.5, 15, -12.353656009),
        (-38.5, 15, -12.353656009),
        (6.5, 15, -12.353656009),
        (-6.5, 15, -12.353656009),
    ]]
    fillet(fillet19_edges, radius=FILLET19_R - 0.0001)  # a hair under: the kernel refuses the full size

    # Fillet20
    fillet20_edges = [part_1.edges().sort_by_distance(p)[0] for p in [
        (-51.5, 52.5, -16),
        (-6.5, 52.5, -16),
        (-38.5, 52.5, -16),
        (-83.5, 52.5, -16),
    ]]
    fillet(fillet20_edges, radius=FILLET20_R)


with BuildPart() as body_2_2:
    # Sketch3 → Boss-Extrude3 (new body)
    with BuildSketch(Plane(origin=(0, 55, 0), x_dir=(1, 0, 0), z_dir=(0, 1, 0))):
        with BuildLine():
            ThreePointArc((30, 0), (27.949747468, 4.949747468), (23, 7))
            ThreePointArc((23, 7), (18.816699867, 5.61248608), (16.291796068, 2))
            Line((16.291796068, 2), (18.417424305, 2))
            ThreePointArc((18.417424305, 2), (24.021548218, 4.894531565), (28, 0))
            ThreePointArc((28, 0), (24.021548218, -4.894531565), (18.417424305, -2))
            Line((18.417424305, -2), (16.291796068, -2))
            ThreePointArc((16.291796068, -2), (18.816699867, -5.61248608), (23, -7))
            ThreePointArc((23, -7), (27.949747468, -4.949747468), (30, 0))
        make_face()
        with BuildLine():
            ThreePointArc((15.874507866, -2), (15.336140253, -4.561008895), (14.38749457, -7))
            Line((14.38749457, -7), (23, -7))
            ThreePointArc((23, -7), (18.816699867, -5.61248608), (16.291796068, -2))
            Line((16.291796068, -2), (15.874507866, -2))
        make_face()
        with BuildLine():
            Line((23, 7), (14.38749457, 7))
            ThreePointArc((14.38749457, 7), (15.336140253, 4.561008895), (15.874507866, 2))
            Line((15.874507866, 2), (16.291796068, 2))
            ThreePointArc((16.291796068, 2), (18.816699867, 5.61248608), (23, 7))
        make_face()
    extrude(amount=-BOSS_EXTRUDE3_DEPTH)


solid = Compound([part_1.part, body_2_2.part])
